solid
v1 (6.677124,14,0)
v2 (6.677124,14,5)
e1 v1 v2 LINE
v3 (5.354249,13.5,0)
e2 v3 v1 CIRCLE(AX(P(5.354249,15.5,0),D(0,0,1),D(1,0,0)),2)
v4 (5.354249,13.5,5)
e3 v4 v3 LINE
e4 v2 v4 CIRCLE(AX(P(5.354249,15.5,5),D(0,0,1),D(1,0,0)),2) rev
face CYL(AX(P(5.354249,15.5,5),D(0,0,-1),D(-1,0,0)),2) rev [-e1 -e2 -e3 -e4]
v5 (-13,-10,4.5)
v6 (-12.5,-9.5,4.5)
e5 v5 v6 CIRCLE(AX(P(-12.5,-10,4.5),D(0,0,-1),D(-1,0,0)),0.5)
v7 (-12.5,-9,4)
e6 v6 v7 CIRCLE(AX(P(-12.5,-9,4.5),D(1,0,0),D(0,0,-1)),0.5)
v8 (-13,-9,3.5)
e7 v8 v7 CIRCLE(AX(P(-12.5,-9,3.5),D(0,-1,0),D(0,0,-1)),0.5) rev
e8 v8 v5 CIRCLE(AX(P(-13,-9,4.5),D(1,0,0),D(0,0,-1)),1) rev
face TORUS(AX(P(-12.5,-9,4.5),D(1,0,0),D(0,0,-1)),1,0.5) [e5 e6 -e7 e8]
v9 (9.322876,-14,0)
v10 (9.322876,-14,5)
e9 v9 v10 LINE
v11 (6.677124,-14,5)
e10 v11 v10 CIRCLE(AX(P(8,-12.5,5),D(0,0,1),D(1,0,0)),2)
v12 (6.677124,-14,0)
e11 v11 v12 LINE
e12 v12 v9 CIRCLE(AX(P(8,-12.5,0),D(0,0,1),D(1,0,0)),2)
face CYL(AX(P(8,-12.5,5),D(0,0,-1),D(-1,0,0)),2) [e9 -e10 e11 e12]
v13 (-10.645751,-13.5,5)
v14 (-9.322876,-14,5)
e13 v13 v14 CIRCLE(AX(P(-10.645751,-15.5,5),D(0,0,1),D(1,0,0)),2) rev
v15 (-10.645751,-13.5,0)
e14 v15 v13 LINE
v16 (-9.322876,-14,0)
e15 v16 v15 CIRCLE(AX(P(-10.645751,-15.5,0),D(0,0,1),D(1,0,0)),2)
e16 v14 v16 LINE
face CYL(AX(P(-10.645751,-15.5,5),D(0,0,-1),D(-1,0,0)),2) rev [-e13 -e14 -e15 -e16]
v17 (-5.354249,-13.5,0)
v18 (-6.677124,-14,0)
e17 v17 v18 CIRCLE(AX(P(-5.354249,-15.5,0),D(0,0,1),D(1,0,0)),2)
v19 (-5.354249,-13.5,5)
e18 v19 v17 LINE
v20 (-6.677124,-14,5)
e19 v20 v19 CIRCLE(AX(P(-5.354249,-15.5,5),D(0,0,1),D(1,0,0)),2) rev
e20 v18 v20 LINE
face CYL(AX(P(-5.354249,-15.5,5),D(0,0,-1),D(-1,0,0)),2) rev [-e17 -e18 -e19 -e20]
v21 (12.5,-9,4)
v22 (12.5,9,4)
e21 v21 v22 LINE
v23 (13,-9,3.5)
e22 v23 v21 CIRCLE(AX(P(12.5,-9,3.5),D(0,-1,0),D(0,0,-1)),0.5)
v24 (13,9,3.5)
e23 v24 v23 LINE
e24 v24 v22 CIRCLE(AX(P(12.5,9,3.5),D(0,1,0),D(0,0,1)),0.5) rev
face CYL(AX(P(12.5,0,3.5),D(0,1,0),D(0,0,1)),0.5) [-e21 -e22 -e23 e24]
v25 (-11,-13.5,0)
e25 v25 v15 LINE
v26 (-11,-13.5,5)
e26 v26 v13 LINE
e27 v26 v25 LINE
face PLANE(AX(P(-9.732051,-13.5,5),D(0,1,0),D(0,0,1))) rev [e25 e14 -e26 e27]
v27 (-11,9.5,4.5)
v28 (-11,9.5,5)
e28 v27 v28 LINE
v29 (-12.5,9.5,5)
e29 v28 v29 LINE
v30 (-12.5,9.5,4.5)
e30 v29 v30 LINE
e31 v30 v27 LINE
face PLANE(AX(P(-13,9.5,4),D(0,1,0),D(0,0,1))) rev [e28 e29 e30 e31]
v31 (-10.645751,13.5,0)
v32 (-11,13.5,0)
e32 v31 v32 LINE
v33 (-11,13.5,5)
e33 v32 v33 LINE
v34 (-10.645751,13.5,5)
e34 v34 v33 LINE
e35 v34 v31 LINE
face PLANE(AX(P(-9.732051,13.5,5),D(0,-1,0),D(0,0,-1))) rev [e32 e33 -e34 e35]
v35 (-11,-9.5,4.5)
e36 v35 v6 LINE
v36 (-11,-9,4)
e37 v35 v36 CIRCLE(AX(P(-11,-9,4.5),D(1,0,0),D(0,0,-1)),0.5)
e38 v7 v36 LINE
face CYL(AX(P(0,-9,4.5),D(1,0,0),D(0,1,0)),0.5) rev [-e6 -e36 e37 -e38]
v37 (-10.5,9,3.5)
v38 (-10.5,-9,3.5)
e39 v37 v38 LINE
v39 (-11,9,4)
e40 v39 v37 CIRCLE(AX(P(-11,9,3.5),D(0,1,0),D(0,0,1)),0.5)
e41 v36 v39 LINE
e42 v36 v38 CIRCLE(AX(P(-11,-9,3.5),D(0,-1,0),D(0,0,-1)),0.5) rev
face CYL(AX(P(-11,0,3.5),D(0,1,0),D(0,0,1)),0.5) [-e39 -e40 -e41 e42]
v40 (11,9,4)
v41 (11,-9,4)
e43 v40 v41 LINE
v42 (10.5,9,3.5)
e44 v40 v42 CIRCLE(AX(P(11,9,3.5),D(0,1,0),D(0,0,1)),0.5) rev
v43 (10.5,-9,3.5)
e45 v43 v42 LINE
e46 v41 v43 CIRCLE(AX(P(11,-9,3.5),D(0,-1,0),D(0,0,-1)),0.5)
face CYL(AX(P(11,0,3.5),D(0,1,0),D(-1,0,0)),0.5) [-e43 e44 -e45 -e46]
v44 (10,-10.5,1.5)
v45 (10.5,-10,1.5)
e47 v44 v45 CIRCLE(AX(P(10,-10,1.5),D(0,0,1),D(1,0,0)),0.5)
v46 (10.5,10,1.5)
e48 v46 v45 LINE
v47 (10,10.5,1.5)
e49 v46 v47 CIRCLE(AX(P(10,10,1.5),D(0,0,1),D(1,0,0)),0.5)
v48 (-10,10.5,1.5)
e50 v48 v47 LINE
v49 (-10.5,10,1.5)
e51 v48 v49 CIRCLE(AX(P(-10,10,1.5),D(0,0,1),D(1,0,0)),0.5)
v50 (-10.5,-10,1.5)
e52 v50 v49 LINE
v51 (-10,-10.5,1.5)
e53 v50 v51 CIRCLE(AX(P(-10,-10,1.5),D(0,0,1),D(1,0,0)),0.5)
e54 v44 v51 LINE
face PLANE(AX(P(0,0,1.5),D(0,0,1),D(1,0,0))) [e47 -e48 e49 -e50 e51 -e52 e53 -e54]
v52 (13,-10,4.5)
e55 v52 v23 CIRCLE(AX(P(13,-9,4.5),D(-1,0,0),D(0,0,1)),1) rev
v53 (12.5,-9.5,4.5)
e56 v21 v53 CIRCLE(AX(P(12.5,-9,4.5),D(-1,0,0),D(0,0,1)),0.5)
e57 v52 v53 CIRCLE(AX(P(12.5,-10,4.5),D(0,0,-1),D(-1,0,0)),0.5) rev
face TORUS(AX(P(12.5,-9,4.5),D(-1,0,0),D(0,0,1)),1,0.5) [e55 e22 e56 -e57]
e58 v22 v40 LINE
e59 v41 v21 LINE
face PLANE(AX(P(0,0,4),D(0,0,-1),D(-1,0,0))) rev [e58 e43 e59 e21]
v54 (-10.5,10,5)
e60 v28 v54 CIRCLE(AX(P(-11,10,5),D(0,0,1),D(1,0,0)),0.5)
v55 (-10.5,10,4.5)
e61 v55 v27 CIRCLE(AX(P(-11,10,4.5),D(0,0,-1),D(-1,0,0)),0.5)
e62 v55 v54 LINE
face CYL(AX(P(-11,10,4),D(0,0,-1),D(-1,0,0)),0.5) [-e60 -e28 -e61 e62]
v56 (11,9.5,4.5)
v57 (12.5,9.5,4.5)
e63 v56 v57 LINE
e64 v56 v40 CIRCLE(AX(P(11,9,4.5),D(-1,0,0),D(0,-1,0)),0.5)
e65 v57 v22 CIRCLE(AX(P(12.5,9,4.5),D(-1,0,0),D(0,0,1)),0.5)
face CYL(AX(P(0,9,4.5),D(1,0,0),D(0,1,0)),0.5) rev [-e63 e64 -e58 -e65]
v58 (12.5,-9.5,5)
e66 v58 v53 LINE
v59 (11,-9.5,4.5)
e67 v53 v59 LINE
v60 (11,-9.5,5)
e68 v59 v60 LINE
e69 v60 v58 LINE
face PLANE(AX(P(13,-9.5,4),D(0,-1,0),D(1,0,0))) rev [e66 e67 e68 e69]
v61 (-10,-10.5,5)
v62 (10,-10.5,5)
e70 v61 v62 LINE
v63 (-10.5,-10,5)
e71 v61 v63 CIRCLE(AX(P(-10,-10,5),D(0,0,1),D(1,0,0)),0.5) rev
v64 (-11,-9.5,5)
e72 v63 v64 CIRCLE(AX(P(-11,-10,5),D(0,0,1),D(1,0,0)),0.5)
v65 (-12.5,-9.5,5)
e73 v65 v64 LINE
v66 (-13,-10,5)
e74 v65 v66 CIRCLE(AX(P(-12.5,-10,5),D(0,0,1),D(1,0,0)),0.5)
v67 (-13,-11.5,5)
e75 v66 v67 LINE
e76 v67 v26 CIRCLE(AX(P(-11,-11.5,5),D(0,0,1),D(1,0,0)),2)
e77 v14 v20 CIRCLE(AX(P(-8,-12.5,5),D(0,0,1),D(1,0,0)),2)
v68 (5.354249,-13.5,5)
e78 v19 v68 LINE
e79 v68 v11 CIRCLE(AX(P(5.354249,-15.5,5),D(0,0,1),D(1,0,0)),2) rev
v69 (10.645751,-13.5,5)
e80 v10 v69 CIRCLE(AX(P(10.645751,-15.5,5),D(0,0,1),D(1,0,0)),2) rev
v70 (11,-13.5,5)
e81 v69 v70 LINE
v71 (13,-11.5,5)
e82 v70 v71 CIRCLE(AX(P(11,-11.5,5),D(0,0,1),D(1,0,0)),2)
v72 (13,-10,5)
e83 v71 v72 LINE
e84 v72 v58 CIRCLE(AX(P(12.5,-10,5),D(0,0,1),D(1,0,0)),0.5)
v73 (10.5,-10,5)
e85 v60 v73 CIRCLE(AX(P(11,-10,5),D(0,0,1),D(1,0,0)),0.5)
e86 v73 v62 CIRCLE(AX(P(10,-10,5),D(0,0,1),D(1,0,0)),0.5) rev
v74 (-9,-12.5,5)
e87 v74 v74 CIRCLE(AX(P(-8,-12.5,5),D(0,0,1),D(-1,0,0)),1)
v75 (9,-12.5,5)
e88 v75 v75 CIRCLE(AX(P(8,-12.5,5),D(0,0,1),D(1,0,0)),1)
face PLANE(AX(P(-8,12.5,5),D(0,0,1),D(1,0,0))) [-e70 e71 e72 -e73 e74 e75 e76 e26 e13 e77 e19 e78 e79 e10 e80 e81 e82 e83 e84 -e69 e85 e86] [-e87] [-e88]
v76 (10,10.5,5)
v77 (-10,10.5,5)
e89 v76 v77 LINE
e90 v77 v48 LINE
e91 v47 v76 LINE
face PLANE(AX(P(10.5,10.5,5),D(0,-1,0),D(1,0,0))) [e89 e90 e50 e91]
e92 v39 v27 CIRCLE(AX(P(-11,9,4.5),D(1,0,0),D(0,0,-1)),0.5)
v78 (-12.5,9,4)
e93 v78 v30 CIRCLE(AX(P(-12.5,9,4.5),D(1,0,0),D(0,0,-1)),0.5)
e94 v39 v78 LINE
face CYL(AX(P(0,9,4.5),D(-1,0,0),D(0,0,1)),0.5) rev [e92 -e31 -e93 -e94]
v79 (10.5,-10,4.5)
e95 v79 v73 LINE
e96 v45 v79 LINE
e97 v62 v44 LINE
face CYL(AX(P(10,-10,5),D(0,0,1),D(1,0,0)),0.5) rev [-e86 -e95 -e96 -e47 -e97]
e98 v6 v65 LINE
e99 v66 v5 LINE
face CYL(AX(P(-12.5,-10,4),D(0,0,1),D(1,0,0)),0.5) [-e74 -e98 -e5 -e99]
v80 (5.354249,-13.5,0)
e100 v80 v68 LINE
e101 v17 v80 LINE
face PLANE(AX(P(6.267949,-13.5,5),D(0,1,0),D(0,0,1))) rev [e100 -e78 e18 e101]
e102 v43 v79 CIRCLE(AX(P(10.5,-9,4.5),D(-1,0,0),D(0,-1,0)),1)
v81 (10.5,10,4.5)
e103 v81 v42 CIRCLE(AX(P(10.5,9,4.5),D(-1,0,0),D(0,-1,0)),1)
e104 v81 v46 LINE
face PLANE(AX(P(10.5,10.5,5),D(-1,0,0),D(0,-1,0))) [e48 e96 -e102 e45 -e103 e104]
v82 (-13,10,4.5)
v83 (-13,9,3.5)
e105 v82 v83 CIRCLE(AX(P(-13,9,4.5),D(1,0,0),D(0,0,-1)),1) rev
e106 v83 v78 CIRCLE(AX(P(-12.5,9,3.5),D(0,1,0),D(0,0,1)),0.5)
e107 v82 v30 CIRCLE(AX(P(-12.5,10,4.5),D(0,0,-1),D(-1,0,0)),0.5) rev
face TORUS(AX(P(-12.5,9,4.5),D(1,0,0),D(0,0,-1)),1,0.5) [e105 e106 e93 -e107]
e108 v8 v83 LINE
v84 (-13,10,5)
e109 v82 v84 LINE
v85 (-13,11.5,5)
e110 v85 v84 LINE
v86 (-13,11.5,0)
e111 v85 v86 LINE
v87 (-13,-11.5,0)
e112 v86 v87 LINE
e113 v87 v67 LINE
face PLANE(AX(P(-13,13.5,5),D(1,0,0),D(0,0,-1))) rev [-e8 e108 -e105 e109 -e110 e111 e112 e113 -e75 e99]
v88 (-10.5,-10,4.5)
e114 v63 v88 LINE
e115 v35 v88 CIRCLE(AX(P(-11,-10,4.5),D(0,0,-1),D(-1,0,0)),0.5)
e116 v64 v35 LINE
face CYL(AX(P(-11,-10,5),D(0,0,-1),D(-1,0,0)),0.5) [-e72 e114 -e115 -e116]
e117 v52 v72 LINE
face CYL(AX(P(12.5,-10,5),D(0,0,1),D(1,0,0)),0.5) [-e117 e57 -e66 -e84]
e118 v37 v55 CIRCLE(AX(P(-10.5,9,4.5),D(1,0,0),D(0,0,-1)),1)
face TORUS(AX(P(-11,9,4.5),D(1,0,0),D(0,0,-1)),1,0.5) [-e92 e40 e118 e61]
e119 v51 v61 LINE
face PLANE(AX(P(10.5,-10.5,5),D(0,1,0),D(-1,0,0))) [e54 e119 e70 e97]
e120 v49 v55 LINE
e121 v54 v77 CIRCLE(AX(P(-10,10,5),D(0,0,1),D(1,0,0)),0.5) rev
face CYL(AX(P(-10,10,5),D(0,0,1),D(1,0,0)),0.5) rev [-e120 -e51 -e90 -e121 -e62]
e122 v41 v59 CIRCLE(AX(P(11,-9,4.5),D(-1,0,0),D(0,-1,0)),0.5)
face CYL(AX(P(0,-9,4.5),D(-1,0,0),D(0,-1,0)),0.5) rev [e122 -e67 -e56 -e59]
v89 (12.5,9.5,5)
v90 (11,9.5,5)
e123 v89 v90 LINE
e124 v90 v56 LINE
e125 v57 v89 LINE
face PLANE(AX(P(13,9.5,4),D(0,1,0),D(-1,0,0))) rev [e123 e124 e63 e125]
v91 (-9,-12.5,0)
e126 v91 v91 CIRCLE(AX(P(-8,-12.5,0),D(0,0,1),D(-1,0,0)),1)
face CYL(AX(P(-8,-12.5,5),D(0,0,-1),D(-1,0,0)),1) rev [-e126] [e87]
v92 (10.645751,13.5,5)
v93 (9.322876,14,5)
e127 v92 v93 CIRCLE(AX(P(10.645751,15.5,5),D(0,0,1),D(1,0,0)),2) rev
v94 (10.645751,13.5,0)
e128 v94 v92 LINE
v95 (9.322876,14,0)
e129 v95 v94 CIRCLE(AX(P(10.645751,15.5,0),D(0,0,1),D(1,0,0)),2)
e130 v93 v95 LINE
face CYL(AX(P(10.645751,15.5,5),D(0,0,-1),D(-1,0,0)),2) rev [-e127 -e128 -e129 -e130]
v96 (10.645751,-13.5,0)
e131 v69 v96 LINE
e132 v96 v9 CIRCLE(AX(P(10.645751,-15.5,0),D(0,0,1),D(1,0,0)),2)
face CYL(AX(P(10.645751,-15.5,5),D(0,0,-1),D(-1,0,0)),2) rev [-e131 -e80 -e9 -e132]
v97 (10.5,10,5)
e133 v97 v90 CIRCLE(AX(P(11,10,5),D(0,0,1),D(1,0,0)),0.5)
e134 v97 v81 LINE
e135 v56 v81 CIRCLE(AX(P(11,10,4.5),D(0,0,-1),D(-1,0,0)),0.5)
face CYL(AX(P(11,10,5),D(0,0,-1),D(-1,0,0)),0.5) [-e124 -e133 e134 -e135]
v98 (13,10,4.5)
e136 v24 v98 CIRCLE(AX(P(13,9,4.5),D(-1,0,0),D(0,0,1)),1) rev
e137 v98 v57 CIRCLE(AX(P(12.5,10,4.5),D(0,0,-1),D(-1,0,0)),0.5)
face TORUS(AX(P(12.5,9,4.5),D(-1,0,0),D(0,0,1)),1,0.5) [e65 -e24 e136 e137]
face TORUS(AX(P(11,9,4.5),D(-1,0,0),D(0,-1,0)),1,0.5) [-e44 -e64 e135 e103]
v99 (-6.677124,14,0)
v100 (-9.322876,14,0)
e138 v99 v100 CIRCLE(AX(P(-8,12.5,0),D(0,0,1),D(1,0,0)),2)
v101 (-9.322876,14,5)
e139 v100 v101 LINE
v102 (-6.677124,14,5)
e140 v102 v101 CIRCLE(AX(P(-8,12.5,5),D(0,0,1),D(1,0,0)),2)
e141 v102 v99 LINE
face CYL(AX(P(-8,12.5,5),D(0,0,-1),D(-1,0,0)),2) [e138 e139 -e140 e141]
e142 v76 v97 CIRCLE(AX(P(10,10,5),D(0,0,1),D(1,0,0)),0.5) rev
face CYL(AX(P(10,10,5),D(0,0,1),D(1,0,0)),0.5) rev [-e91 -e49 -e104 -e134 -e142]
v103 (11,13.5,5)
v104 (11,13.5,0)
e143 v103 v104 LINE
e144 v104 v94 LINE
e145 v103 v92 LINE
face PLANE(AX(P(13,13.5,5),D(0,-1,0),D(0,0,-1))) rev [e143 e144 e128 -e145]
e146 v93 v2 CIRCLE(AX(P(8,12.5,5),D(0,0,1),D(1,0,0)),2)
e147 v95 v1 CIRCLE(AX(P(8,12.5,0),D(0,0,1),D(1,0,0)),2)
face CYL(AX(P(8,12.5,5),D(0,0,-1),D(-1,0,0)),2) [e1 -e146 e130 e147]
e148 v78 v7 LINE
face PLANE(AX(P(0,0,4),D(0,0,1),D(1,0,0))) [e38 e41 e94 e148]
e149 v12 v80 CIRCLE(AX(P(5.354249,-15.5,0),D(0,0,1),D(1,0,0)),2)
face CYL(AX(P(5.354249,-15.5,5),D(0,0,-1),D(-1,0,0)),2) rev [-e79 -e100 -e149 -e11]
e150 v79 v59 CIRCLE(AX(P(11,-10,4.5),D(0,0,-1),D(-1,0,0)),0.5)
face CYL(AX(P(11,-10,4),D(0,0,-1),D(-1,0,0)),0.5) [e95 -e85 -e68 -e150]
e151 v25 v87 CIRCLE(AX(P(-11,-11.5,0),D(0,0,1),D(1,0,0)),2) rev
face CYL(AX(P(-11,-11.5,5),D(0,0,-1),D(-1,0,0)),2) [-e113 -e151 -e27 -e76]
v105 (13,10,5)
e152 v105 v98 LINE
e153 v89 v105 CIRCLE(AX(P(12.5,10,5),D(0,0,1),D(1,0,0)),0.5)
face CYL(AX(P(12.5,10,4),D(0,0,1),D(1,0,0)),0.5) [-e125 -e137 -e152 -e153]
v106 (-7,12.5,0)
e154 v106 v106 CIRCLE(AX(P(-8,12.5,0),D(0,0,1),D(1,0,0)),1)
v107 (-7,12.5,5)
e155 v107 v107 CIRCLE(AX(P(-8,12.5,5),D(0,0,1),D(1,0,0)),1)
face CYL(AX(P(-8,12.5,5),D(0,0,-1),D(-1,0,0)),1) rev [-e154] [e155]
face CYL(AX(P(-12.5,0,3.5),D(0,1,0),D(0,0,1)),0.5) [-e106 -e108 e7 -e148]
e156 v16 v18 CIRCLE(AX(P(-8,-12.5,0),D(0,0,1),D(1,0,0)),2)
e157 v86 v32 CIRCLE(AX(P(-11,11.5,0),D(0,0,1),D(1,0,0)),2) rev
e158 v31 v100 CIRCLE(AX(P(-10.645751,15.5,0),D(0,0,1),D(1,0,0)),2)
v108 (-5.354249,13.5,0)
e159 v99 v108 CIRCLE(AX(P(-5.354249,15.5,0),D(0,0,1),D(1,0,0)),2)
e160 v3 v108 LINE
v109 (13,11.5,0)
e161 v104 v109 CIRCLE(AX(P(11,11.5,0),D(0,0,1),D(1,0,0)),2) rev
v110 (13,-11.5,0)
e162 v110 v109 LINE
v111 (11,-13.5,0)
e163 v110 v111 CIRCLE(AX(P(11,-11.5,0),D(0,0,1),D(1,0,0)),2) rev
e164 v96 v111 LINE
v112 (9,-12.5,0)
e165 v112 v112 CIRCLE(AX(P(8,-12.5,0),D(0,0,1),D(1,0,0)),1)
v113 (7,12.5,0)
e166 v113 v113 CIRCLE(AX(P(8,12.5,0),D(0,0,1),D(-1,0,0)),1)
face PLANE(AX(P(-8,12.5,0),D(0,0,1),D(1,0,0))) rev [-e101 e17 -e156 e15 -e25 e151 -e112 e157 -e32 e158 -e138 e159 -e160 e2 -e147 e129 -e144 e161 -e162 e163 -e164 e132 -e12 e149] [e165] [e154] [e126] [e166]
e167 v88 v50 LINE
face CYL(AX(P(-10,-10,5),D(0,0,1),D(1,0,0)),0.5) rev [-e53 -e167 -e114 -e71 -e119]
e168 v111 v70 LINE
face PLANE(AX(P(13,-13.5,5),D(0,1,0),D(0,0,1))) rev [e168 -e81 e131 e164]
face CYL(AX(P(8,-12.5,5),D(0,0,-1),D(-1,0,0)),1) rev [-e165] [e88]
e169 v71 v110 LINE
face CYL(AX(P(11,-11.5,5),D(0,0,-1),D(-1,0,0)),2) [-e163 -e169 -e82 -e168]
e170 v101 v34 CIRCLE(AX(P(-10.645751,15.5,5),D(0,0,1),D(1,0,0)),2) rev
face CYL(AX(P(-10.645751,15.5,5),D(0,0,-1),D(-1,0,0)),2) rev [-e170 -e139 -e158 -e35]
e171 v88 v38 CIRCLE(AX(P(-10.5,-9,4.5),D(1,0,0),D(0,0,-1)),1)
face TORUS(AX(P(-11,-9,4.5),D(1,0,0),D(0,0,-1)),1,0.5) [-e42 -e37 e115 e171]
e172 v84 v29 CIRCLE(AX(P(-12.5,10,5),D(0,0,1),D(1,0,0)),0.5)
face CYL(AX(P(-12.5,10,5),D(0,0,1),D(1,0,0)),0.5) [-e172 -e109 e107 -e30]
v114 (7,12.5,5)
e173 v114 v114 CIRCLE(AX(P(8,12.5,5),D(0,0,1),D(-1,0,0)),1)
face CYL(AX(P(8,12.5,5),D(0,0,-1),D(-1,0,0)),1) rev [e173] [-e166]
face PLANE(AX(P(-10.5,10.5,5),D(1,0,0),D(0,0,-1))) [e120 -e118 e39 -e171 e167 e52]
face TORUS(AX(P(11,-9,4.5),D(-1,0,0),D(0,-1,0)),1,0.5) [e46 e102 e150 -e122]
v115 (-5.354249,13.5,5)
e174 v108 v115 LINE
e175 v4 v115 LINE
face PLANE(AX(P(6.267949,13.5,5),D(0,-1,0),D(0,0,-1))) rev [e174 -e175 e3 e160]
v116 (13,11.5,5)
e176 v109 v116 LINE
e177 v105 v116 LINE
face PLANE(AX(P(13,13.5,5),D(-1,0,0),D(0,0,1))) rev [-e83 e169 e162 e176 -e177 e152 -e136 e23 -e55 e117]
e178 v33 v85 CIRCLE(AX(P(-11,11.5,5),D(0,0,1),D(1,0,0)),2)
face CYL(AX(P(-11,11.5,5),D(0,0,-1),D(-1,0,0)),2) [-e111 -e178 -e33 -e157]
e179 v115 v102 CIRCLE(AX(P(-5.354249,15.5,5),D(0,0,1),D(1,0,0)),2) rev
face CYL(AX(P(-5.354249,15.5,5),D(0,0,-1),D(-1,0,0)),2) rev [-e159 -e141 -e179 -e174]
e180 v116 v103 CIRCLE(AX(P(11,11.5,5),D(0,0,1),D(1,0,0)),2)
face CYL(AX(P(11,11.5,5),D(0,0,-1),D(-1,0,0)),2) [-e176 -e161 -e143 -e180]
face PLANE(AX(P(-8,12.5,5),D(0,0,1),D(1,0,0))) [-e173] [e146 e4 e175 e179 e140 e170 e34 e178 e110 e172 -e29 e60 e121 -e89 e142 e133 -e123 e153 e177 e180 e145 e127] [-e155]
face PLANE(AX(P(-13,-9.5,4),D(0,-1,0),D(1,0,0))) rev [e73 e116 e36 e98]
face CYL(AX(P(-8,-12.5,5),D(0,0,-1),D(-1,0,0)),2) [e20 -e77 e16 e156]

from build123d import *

# Parameters (mm, degrees)
ESQUISSE1_R             = 1
ESQUISSE1_W             = 21
ESQUISSE1_H             = 21
BOSS_EXTRU_1_DEPTH      = 5
ESQUISSE2_W             = 21
ESQUISSE2_H             = 21
BOSS_EXTRU_2_DEPTH      = 1.5
ESQUISSE3_W             = 2.5
ESQUISSE3_H             = 19
ENL_V_MAT_EXTRU_1_DEPTH = 1
CONG_1_R                = 2
CONG_2_R                = 2
CONG_3_R                = 0.5


with BuildPart() as part:
    # Esquisse1 → Boss.-Extru.1 (new body)
    with BuildSketch(Plane.XY):
        with BuildLine():
            Line((13, 13.5), (9.732050808, 13.5))
            ThreePointArc((9.732050808, 13.5), (8, 14.5), (6.267949192, 13.5))
            Line((6.267949192, 13.5), (-6.267949192, 13.5))
            ThreePointArc((-6.267949192, 13.5), (-8, 14.5), (-9.732050808, 13.5))
            Line((-9.732050808, 13.5), (-13, 13.5))
            Line((-13, 13.5), (-13, -13.5))
            Line((-13, -13.5), (-9.732050808, -13.5))
            ThreePointArc((-9.732050808, -13.5), (-8, -14.5), (-6.267949192, -13.5))
            Line((-6.267949192, -13.5), (6.267949192, -13.5))
            ThreePointArc((6.267949192, -13.5), (8, -14.5), (9.732050808, -13.5))
            Line((9.732050808, -13.5), (13, -13.5))
            Line((13, -13.5), (13, 13.5))
        make_face()
        with Locations((-8, 12.5)):
            Circle(ESQUISSE1_R, mode=Mode.SUBTRACT)
        with Locations(Location((8, 12.5, 0), (0, 0, 180))):
            Circle(ESQUISSE1_R, mode=Mode.SUBTRACT)
        with Locations((8, -12.5)):
            Circle(ESQUISSE1_R, mode=Mode.SUBTRACT)
        with Locations(Location((-8, -12.5, 0), (0, 0, 180))):
            Circle(ESQUISSE1_R, mode=Mode.SUBTRACT)
        Rectangle(ESQUISSE1_W, ESQUISSE1_H, mode=Mode.SUBTRACT)
    extrude(amount=BOSS_EXTRU_1_DEPTH)

    # Esquisse2 → Boss.-Extru.2 (add)
    with BuildSketch(Plane(origin=(0, 0, 0), x_dir=(-1, 0, 0), z_dir=(0, 0, -1))):
        Rectangle(ESQUISSE2_W, ESQUISSE2_H)
    extrude(amount=-BOSS_EXTRU_2_DEPTH)

    # Esquisse3 → Enlèv. mat.-Extru.1 (cut)
    with BuildSketch(Plane.XY.offset(5)):
        with Locations((-11.75, 0)):
            Rectangle(ESQUISSE3_W, ESQUISSE3_H)
        with Locations((11.75, 0)):
            Rectangle(ESQUISSE3_W, ESQUISSE3_H)
    extrude(amount=-ENL_V_MAT_EXTRU_1_DEPTH, mode=Mode.SUBTRACT)

    # Congé1
    cong_1_edges = [part.edges().sort_by_distance(p)[0] for p in [
        (-13, -13.5, 2.5),
        (-13, 13.5, 2.5),
        (13, 13.5, 2.5),
        (13, -13.5, 2.5),
    ]]
    fillet(cong_1_edges, radius=CONG_1_R)

    # Congé2
    cong_2_edges = [part.edges().sort_by_distance(p)[0] for p in [
        (-9.732050808, 13.5, 2.5),
        (-6.267949192, 13.5, 2.5),
        (6.267949192, 13.5, 2.5),
        (9.732050808, 13.5, 2.5),
        (9.732050808, -13.5, 2.5),
        (6.267949192, -13.5, 2.5),
        (-6.267949192, -13.5, 2.5),
        (-9.732050808, -13.5, 2.5),
    ]]
    fillet(cong_2_edges, radius=CONG_2_R)

    # Congé3
    cong_3_edges = [part.edges().sort_by_distance(p)[0] for p in [
        (13, -9.5, 4.5),
        (-13, 9.5, 4.5),
        (-13, -9.5, 4.5),
        (-10.5, -9.5, 4.5),
        (-10.5, 9.5, 4.5),
        (10.5, 9.5, 4.5),
        (10.5, -9.5, 4.5),
        (13, 0, 4),
        (-13, 0, 4),
        (-10.5, 0, 4),
        (10.5, 0, 4),
        (13, 9.5, 4.5),
        (11.75, -9.5, 4),
        (11.75, 9.5, 4),
        (-11.75, 9.5, 4),
        (-11.75, -9.5, 4),
        (-10.5, -10.5, 3.25),
        (10.5, -10.5, 3.25),
        (10.5, 10.5, 3.25),
        (-10.5, 10.5, 3.25),
    ]]
    fillet(cong_3_edges, radius=CONG_3_R - 0.0001)  # a hair under: the kernel refuses the full size


solid = part.part
